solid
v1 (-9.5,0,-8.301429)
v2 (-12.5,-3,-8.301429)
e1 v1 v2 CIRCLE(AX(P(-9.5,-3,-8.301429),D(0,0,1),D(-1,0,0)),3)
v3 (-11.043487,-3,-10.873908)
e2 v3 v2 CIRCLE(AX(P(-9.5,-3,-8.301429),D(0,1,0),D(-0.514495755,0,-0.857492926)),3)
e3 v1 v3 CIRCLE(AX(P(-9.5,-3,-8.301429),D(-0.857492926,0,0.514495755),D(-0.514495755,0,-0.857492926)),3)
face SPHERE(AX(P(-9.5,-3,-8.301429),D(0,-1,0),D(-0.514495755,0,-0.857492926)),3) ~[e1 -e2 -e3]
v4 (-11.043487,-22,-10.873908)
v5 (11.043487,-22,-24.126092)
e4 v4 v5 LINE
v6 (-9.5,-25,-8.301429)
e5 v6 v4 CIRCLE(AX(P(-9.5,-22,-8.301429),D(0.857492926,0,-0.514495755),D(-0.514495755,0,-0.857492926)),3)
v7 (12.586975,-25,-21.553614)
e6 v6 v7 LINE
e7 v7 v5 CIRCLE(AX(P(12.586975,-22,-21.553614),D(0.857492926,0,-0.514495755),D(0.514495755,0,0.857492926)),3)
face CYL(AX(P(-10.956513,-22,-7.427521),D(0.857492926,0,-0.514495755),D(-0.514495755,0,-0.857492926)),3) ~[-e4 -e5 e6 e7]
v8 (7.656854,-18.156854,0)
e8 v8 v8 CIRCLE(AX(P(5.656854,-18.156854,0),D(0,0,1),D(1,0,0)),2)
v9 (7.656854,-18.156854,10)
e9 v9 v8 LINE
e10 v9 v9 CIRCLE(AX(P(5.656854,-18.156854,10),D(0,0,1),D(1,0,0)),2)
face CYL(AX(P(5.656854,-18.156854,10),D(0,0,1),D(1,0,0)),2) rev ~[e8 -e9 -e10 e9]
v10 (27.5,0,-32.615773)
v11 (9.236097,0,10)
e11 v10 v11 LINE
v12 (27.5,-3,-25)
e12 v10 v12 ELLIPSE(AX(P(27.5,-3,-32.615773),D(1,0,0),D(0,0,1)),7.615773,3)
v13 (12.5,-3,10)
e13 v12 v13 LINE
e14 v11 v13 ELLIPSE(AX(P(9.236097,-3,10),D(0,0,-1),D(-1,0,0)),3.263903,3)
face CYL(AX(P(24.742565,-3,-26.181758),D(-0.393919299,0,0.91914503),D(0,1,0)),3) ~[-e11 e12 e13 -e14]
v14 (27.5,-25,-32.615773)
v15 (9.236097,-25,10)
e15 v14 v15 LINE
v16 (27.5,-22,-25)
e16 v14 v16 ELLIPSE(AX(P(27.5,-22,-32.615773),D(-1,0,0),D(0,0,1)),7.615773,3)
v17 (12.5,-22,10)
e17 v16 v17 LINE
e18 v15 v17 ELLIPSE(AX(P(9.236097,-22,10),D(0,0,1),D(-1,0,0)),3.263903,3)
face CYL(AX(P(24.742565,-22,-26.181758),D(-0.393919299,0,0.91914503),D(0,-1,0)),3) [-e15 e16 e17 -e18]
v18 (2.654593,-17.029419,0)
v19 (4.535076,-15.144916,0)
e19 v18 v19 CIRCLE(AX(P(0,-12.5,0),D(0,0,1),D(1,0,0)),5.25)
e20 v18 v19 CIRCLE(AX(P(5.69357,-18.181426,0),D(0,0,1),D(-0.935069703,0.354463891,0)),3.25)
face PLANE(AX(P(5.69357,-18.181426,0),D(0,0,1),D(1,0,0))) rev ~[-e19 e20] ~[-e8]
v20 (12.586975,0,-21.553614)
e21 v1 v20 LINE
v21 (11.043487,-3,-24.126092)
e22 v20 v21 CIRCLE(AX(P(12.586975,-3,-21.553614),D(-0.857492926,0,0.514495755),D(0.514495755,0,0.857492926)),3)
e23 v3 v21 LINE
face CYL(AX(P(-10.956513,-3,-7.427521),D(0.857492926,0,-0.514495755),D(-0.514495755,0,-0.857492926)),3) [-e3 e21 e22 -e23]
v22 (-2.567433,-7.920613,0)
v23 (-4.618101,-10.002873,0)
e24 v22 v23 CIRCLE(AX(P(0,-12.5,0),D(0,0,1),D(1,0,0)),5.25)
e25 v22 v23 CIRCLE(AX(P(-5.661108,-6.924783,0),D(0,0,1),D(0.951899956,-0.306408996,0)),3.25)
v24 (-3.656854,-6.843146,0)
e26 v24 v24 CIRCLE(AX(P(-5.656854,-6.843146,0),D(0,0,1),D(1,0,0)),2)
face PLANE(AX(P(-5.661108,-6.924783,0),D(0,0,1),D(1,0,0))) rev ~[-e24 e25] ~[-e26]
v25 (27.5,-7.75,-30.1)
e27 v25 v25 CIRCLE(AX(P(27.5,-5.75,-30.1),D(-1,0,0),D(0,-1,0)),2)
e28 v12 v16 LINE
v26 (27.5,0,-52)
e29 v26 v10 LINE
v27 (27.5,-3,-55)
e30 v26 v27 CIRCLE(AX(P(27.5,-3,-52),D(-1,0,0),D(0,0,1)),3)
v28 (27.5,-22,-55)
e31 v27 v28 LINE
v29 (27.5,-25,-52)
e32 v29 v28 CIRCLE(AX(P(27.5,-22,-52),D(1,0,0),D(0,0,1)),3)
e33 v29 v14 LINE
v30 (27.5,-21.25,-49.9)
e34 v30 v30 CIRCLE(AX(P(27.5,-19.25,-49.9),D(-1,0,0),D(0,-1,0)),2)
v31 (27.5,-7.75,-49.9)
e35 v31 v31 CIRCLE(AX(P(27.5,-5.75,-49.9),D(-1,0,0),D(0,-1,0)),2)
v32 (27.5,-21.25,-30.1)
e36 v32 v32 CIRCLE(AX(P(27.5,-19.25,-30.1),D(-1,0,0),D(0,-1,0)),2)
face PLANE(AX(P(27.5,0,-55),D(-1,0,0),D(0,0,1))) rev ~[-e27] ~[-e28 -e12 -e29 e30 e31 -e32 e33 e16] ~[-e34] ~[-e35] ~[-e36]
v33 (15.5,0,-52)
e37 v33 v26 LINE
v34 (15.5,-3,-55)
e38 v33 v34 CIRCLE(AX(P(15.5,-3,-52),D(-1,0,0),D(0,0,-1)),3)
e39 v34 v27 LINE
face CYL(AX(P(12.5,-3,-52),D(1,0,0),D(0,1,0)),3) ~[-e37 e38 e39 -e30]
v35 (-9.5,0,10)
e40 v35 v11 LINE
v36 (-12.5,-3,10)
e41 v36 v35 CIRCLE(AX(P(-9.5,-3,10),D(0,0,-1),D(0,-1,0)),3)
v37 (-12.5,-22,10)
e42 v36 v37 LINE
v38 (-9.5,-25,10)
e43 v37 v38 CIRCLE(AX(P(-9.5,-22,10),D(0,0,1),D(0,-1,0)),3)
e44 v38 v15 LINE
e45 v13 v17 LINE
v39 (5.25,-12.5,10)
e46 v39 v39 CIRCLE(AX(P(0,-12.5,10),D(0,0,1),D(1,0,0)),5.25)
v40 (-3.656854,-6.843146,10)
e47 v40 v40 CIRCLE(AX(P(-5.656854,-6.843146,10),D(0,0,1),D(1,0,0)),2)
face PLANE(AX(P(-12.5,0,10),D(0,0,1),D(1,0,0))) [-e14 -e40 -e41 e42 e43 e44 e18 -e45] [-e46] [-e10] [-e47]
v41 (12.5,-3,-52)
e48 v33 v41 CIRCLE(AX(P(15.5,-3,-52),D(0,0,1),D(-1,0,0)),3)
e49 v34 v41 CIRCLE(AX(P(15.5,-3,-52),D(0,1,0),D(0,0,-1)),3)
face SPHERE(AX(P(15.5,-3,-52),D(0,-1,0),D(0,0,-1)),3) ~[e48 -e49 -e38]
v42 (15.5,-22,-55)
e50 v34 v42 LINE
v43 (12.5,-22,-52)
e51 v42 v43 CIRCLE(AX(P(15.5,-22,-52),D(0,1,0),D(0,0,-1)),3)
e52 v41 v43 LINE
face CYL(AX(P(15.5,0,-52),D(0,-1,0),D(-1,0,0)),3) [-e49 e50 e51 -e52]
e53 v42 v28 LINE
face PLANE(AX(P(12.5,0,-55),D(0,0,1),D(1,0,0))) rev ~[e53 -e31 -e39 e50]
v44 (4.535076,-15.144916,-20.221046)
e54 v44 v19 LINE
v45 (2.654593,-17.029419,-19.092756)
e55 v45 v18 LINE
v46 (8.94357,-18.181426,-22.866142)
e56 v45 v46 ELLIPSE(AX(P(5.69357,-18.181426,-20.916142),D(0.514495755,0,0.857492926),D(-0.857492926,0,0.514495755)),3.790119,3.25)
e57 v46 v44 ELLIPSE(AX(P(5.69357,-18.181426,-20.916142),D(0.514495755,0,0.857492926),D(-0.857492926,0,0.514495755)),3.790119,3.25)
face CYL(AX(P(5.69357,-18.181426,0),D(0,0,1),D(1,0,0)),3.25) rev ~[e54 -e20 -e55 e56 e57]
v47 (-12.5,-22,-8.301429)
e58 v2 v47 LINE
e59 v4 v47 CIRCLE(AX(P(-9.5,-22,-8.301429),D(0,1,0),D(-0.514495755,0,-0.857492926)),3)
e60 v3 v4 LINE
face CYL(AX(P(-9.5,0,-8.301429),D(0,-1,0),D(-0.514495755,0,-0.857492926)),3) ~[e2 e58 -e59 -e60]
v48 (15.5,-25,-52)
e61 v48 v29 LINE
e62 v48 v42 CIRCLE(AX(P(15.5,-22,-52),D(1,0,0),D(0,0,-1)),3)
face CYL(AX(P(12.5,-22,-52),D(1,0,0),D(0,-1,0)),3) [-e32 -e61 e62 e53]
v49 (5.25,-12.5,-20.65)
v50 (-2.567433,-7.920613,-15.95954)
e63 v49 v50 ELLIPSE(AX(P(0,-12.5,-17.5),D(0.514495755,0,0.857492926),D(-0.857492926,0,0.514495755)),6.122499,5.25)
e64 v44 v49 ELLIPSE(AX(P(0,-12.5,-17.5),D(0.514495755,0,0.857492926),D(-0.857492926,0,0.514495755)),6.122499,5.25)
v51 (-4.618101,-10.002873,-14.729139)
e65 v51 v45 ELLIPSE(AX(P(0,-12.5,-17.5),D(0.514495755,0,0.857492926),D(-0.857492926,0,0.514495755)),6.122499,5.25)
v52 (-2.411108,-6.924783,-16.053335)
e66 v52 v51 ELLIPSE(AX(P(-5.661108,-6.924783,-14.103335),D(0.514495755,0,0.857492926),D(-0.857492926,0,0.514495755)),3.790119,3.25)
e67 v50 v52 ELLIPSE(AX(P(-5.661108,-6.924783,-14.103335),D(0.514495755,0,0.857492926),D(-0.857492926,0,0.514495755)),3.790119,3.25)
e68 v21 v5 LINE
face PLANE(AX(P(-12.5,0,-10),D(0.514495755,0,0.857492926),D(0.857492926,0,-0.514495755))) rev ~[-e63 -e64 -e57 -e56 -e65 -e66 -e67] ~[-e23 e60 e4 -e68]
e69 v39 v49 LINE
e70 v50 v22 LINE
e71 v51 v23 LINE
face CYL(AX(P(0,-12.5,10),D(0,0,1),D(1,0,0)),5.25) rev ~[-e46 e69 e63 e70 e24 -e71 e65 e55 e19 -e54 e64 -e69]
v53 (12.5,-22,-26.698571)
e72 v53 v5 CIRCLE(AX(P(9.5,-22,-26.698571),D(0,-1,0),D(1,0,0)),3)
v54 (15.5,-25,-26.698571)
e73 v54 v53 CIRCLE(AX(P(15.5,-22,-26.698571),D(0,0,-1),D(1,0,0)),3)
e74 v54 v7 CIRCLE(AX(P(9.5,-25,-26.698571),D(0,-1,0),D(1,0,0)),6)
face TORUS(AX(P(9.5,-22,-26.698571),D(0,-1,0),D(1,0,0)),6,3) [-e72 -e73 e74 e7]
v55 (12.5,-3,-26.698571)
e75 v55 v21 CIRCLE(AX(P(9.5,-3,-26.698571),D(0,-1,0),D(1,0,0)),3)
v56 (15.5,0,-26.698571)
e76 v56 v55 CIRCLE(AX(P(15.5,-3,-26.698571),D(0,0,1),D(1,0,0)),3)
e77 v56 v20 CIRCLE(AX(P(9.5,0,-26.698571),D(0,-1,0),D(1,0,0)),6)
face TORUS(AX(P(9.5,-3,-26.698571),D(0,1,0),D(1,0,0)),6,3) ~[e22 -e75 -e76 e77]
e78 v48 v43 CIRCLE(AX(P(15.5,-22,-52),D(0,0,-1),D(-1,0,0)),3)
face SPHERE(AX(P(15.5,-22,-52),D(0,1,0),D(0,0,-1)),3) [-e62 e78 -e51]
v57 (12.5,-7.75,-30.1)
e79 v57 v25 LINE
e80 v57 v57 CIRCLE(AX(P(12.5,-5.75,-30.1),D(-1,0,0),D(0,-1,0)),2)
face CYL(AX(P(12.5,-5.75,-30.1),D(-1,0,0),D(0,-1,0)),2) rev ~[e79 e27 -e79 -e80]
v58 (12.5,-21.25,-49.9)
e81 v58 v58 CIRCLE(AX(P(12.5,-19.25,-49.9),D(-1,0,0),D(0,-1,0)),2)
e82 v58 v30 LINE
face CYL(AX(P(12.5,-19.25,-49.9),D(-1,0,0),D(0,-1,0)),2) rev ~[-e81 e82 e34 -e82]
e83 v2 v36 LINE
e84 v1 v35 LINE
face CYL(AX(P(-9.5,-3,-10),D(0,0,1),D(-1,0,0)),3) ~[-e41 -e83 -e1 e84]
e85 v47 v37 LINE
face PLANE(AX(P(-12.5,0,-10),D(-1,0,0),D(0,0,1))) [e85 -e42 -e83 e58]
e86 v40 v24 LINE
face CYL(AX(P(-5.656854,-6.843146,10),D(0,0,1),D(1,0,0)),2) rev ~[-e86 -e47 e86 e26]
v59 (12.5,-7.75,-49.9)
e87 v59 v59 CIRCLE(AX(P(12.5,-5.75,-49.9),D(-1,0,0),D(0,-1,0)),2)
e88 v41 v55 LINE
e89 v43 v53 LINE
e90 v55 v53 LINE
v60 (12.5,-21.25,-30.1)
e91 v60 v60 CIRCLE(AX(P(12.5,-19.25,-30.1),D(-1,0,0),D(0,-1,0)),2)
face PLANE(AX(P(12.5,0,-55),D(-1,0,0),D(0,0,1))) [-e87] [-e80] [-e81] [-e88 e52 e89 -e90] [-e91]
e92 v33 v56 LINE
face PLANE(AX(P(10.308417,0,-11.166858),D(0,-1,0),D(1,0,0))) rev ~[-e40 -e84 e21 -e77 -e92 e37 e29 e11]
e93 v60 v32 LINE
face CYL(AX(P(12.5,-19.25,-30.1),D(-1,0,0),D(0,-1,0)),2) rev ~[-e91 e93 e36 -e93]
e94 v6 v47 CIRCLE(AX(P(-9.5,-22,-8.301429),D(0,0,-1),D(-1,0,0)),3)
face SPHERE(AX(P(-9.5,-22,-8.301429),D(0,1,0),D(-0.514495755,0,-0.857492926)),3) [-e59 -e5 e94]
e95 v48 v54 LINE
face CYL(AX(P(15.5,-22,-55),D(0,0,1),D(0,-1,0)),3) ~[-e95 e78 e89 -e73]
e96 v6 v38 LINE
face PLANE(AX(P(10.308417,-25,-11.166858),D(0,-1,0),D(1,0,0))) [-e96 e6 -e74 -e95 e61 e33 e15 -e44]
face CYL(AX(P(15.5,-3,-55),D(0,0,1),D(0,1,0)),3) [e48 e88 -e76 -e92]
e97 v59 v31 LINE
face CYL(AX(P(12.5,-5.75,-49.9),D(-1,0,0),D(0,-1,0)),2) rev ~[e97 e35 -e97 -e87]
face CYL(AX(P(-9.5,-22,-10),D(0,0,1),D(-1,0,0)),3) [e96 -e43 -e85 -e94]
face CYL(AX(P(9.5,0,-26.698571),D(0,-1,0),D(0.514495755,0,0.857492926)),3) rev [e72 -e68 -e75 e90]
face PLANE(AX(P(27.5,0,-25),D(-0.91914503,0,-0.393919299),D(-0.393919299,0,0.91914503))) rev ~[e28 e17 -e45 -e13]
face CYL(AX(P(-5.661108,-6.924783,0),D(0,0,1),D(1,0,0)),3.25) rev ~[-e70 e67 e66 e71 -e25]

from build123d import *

# Parameters (mm, degrees)
F0_W      = 25
F0_H      = 20
F0_W_2    = 15
F0_H_2    = 30
F1_DEPTH  = 25
F2_R      = 5.25
F3_DEPTH  = 65.001
F4_R      = 2
F5_DEPTH  = 25
F6_R      = 3
F7_R      = 2
F8_DEPTH  = 65.001
F9_R      = 3.25
F10_DEPTH = 55.001


with BuildPart() as f1:
    # F0 (on Front) → F1 (new body)
    with BuildSketch(Plane.XZ):
        Polygon((12.5, 10), (12.5, -10), (-12.5, -10), (12.5, -25), (27.5, -25), align=None)
        Rectangle(F0_W, F0_H)
        with Locations((20, -40)):
            Rectangle(F0_W_2, F0_H_2)
    extrude(amount=F1_DEPTH)

    # F2 (on face) → F3 (cut, through all)
    with BuildSketch(Plane.XY.offset(10)):
        with Locations((0, -12.5)):
            Circle(F2_R)
    extrude(amount=-F3_DEPTH, mode=Mode.SUBTRACT)

    # F4 (on face) → F5 (cut)
    with BuildSketch(Plane(origin=(12.5, 0, 0), x_dir=(0, -1, 0), z_dir=(-1, 0, 0))):
        with Locations((19.25, -30.1)):
            Circle(F4_R)
        with Locations((5.75, -49.9)):
            Circle(F4_R)
        with Locations((5.75, -30.1)):
            Circle(F4_R)
        with Locations((19.25, -49.9)):
            Circle(F4_R)
    extrude(amount=-F5_DEPTH, mode=Mode.SUBTRACT)

    # F6
    f6_edges = [f1.edges().sort_by_distance(p)[0] for p in [
        (-12.5, -25, 0),
        (-12.5, 0, 0),
        (-12.5, -12.5, -10),
        (0, -25, -17.5),
        (0, 0, -17.5),
        (12.5, -12.5, -25),
        (12.5, -12.5, -55),
        (20, -25, -7.5),
        (20, 0, -7.5),
        (20, -25, -55),
        (20, 0, -55),
        (12.5, 0, -40),
        (12.5, -25, -40),
    ]]
    fillet(f6_edges, radius=F6_R)

    # F7 (on face) → F8 (cut, through all)
    with BuildSketch(Plane.XY.offset(10)):
        with Locations((-5.6568542495, -6.8431457505)):
            Circle(F7_R)
        with Locations((5.6568542495, -18.1568542495)):
            Circle(F7_R)
    extrude(amount=-F8_DEPTH, mode=Mode.SUBTRACT)

    # F9 (on Top) → F10 (cut, through all)
    with BuildSketch(Plane.XY):
        with Locations((-5.6611075997, -6.9247833453)):
            Circle(F9_R)
        with Locations((5.6935697794, -18.1814264506)):
            Circle(F9_R)
    extrude(amount=-F10_DEPTH, mode=Mode.SUBTRACT)


solid = f1.part
